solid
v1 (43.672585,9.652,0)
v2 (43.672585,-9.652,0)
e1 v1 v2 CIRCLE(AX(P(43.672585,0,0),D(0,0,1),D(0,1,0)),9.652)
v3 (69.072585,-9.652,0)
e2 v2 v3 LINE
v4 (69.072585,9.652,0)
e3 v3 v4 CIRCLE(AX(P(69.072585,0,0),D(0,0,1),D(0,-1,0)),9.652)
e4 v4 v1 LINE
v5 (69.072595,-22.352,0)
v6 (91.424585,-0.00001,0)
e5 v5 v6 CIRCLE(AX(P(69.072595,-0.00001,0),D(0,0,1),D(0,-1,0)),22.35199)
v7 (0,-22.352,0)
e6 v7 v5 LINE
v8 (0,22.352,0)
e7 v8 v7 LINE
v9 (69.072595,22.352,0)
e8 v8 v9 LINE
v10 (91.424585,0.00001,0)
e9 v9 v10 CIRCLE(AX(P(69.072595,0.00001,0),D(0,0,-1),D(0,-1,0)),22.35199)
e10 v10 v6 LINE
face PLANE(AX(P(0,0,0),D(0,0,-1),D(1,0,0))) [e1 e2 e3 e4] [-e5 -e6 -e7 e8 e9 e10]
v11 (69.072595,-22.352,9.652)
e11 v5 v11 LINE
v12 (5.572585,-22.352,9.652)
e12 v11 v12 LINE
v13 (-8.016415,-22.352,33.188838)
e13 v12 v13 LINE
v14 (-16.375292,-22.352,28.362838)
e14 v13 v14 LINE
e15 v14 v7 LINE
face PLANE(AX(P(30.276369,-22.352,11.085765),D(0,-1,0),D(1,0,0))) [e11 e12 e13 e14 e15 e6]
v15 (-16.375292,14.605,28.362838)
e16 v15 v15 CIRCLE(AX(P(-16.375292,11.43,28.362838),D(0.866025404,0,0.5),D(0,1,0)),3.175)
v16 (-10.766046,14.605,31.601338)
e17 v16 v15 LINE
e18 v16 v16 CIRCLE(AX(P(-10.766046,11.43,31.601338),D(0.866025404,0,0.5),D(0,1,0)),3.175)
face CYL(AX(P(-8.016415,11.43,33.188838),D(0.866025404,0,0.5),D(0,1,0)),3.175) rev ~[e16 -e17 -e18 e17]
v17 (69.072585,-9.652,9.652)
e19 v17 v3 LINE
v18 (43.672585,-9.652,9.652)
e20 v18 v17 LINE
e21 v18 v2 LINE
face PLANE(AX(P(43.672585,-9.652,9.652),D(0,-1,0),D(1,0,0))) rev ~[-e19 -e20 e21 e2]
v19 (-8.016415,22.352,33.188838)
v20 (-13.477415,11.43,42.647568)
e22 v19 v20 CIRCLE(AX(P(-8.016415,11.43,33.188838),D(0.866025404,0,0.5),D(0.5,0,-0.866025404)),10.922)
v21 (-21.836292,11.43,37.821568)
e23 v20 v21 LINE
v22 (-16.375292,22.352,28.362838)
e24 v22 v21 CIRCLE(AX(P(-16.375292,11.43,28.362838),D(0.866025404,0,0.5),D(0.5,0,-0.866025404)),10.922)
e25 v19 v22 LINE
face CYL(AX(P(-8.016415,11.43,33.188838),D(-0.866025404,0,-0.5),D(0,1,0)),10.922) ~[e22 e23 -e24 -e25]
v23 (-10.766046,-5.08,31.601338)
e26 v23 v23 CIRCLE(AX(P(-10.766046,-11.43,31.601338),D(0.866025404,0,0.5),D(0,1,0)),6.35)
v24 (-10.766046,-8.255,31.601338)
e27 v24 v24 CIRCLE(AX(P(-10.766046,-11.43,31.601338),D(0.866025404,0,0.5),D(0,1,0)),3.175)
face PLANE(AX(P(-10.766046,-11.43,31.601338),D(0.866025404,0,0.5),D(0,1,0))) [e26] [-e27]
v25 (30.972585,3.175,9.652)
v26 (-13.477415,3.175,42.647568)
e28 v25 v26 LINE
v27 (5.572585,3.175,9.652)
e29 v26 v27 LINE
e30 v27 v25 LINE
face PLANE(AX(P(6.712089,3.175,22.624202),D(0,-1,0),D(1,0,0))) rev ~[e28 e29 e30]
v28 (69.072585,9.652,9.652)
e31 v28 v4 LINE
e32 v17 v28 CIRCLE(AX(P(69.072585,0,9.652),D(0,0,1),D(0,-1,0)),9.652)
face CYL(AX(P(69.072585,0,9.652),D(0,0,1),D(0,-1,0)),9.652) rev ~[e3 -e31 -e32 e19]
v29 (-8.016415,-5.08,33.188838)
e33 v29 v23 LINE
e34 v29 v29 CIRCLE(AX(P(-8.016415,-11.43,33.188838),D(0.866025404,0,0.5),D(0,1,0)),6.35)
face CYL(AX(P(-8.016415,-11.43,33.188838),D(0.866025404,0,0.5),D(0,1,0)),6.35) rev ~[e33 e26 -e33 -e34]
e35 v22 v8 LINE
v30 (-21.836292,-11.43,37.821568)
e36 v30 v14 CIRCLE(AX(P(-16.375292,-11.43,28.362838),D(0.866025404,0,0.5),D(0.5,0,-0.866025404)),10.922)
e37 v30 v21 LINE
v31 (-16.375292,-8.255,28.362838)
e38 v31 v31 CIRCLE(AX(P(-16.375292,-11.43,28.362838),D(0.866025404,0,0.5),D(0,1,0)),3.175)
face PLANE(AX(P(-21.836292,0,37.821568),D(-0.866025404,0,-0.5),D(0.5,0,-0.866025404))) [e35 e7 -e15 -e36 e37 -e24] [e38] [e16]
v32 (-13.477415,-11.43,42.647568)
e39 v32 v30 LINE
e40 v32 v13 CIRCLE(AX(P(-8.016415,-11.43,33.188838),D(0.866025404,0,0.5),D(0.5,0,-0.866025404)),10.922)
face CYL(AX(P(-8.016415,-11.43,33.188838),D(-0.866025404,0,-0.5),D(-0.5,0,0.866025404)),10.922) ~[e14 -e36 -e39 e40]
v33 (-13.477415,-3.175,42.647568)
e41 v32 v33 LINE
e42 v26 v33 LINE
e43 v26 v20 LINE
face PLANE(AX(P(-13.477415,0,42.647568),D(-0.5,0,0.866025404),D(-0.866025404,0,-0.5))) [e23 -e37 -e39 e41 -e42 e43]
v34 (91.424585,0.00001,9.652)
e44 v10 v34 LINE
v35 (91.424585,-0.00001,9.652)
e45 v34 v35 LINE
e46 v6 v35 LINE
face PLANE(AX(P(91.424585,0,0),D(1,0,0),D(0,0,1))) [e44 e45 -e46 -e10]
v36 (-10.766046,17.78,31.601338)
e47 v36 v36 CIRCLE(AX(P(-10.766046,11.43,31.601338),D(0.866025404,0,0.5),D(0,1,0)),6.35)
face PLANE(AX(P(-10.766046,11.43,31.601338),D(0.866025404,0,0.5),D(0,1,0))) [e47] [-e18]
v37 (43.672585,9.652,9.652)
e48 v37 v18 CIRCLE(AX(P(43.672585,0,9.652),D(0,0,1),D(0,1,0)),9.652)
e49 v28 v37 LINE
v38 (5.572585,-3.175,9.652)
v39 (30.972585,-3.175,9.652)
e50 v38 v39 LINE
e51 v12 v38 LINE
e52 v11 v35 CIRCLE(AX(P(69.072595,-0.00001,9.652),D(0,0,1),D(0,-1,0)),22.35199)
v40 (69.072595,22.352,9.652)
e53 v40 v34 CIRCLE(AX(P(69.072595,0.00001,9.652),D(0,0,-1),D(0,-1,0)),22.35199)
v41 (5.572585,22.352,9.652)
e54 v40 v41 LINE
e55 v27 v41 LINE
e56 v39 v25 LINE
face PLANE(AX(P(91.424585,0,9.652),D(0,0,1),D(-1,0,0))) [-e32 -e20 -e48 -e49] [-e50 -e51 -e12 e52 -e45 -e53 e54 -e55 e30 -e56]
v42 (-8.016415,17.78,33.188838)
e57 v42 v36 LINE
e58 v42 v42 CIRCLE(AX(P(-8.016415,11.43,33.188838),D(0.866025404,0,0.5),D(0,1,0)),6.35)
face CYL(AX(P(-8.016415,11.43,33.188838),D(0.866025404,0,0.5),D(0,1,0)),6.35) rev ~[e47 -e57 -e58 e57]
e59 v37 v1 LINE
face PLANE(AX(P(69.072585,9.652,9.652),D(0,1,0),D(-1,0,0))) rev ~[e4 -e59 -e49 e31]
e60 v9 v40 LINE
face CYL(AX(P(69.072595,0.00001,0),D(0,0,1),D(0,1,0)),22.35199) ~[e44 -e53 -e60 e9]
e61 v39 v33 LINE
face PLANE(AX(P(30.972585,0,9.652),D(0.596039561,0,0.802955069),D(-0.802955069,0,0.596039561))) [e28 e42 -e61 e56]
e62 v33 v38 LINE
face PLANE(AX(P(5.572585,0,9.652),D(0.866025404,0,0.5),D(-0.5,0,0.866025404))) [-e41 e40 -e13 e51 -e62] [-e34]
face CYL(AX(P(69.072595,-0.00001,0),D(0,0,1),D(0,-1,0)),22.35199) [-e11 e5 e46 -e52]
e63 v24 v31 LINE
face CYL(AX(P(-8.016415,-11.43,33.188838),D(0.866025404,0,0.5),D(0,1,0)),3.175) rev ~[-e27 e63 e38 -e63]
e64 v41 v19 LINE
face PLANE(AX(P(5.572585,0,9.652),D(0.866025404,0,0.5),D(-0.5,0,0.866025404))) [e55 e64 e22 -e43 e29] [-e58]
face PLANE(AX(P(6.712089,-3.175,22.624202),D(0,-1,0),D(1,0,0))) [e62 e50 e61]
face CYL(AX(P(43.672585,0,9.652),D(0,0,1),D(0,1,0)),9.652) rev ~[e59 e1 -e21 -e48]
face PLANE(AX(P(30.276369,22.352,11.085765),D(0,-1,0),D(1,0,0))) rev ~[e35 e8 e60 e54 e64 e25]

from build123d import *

# Parameters (mm, degrees)
F1_DEPTH = 22.352
F2_DEPTH = 3.175
F3_R     = 22.35199
F5_DEPTH = 9.652
F7_R     = 3.175
F8_DEPTH = 25.4
F7_R_2   = 6.35
F9_DEPTH = 3.175
F10_R    = 10.922


# Not quite as in the source:
# - a fillet or chamfer is up to 0.001 mm smaller than in the source, because OpenCascade refuses the exact size


with BuildPart() as f1:
    # F0 (on Front) → F1 (new body, symmetric)
    with BuildSketch(Plane.XZ):
        Polygon((-21.8362923991, 37.8215678842), (0, 0), (91.4245847982, 0), (91.4245847982, 9.652), (30.9725847982, 9.652), (5.5725847982, 9.652), (-13.4774152018, 42.6475678842), align=None)
    extrude(amount=F1_DEPTH, both=True)

    # F0 (on Front) → F2 (join, symmetric)
    with BuildSketch(Plane.XZ):
        Polygon((30.9725847982, 9.652), (-13.4774152018, 42.6475678842), (5.5725847982, 9.652), align=None)
    extrude(amount=F2_DEPTH, both=True)

    # F3 (radius 22.352 in the source; OpenCascade refuses exactly that, so slightly less here)
    f3_edges = [f1.edges().sort_by_distance(p)[0] for p in [
        (91.424585, 22.352, 4.826),
        (91.424585, -22.352, 4.826),
    ]]
    fillet(f3_edges, radius=F3_R)

    # F4 (on face) → F5 (cut, through all)
    with BuildSketch(Plane.XY.offset(9.652)):
        with BuildLine():
            Line((69.0725847982, 9.652), (43.6725847982, 9.652))
            ThreePointArc((43.6725847982, 9.652), (34.0205847982, 0), (43.6725847982, -9.652))
            Line((43.6725847982, -9.652), (69.0725847982, -9.652))
            ThreePointArc((69.0725847982, -9.652), (78.7245847982, 0), (69.0725847982, 9.652))
        make_face()
    extrude(amount=-F5_DEPTH, mode=Mode.SUBTRACT)

    # F7 (on face) → F8 (cut)
    with BuildSketch(Plane(origin=(8.3588771973, 0, 4.826), x_dir=(0, 1, 0), z_dir=(0.8660254038, 0, 0.5))):
        with Locations((11.43, 32.7505847982)):
            Circle(F7_R)
        with Locations((-11.43, 32.7505847982)):
            Circle(F7_R)
    extrude(amount=-F8_DEPTH, mode=Mode.SUBTRACT)

    # F7 (on face) → F9 (cut)
    with BuildSketch(Plane(origin=(8.3588771973, 0, 4.826), x_dir=(0, 1, 0), z_dir=(0.8660254038, 0, 0.5))):
        with Locations((-11.43, 32.7505847982)):
            Circle(F7_R_2)
        with Locations((-11.43, 32.7505847982)):
            Circle(F7_R, mode=Mode.SUBTRACT)
        with Locations((11.43, 32.7505847982)):
            Circle(F7_R_2)
        with Locations((11.43, 32.7505847982)):
            Circle(F7_R, mode=Mode.SUBTRACT)
    extrude(amount=-F9_DEPTH, mode=Mode.SUBTRACT)

    # F10
    f10_edges = [f1.edges().sort_by_distance(p)[0] for p in [
        (-17.656854, 22.352, 40.234568),
        (-17.656854, -22.352, 40.234568),
    ]]
    fillet(f10_edges, radius=F10_R)


solid = f1.part
